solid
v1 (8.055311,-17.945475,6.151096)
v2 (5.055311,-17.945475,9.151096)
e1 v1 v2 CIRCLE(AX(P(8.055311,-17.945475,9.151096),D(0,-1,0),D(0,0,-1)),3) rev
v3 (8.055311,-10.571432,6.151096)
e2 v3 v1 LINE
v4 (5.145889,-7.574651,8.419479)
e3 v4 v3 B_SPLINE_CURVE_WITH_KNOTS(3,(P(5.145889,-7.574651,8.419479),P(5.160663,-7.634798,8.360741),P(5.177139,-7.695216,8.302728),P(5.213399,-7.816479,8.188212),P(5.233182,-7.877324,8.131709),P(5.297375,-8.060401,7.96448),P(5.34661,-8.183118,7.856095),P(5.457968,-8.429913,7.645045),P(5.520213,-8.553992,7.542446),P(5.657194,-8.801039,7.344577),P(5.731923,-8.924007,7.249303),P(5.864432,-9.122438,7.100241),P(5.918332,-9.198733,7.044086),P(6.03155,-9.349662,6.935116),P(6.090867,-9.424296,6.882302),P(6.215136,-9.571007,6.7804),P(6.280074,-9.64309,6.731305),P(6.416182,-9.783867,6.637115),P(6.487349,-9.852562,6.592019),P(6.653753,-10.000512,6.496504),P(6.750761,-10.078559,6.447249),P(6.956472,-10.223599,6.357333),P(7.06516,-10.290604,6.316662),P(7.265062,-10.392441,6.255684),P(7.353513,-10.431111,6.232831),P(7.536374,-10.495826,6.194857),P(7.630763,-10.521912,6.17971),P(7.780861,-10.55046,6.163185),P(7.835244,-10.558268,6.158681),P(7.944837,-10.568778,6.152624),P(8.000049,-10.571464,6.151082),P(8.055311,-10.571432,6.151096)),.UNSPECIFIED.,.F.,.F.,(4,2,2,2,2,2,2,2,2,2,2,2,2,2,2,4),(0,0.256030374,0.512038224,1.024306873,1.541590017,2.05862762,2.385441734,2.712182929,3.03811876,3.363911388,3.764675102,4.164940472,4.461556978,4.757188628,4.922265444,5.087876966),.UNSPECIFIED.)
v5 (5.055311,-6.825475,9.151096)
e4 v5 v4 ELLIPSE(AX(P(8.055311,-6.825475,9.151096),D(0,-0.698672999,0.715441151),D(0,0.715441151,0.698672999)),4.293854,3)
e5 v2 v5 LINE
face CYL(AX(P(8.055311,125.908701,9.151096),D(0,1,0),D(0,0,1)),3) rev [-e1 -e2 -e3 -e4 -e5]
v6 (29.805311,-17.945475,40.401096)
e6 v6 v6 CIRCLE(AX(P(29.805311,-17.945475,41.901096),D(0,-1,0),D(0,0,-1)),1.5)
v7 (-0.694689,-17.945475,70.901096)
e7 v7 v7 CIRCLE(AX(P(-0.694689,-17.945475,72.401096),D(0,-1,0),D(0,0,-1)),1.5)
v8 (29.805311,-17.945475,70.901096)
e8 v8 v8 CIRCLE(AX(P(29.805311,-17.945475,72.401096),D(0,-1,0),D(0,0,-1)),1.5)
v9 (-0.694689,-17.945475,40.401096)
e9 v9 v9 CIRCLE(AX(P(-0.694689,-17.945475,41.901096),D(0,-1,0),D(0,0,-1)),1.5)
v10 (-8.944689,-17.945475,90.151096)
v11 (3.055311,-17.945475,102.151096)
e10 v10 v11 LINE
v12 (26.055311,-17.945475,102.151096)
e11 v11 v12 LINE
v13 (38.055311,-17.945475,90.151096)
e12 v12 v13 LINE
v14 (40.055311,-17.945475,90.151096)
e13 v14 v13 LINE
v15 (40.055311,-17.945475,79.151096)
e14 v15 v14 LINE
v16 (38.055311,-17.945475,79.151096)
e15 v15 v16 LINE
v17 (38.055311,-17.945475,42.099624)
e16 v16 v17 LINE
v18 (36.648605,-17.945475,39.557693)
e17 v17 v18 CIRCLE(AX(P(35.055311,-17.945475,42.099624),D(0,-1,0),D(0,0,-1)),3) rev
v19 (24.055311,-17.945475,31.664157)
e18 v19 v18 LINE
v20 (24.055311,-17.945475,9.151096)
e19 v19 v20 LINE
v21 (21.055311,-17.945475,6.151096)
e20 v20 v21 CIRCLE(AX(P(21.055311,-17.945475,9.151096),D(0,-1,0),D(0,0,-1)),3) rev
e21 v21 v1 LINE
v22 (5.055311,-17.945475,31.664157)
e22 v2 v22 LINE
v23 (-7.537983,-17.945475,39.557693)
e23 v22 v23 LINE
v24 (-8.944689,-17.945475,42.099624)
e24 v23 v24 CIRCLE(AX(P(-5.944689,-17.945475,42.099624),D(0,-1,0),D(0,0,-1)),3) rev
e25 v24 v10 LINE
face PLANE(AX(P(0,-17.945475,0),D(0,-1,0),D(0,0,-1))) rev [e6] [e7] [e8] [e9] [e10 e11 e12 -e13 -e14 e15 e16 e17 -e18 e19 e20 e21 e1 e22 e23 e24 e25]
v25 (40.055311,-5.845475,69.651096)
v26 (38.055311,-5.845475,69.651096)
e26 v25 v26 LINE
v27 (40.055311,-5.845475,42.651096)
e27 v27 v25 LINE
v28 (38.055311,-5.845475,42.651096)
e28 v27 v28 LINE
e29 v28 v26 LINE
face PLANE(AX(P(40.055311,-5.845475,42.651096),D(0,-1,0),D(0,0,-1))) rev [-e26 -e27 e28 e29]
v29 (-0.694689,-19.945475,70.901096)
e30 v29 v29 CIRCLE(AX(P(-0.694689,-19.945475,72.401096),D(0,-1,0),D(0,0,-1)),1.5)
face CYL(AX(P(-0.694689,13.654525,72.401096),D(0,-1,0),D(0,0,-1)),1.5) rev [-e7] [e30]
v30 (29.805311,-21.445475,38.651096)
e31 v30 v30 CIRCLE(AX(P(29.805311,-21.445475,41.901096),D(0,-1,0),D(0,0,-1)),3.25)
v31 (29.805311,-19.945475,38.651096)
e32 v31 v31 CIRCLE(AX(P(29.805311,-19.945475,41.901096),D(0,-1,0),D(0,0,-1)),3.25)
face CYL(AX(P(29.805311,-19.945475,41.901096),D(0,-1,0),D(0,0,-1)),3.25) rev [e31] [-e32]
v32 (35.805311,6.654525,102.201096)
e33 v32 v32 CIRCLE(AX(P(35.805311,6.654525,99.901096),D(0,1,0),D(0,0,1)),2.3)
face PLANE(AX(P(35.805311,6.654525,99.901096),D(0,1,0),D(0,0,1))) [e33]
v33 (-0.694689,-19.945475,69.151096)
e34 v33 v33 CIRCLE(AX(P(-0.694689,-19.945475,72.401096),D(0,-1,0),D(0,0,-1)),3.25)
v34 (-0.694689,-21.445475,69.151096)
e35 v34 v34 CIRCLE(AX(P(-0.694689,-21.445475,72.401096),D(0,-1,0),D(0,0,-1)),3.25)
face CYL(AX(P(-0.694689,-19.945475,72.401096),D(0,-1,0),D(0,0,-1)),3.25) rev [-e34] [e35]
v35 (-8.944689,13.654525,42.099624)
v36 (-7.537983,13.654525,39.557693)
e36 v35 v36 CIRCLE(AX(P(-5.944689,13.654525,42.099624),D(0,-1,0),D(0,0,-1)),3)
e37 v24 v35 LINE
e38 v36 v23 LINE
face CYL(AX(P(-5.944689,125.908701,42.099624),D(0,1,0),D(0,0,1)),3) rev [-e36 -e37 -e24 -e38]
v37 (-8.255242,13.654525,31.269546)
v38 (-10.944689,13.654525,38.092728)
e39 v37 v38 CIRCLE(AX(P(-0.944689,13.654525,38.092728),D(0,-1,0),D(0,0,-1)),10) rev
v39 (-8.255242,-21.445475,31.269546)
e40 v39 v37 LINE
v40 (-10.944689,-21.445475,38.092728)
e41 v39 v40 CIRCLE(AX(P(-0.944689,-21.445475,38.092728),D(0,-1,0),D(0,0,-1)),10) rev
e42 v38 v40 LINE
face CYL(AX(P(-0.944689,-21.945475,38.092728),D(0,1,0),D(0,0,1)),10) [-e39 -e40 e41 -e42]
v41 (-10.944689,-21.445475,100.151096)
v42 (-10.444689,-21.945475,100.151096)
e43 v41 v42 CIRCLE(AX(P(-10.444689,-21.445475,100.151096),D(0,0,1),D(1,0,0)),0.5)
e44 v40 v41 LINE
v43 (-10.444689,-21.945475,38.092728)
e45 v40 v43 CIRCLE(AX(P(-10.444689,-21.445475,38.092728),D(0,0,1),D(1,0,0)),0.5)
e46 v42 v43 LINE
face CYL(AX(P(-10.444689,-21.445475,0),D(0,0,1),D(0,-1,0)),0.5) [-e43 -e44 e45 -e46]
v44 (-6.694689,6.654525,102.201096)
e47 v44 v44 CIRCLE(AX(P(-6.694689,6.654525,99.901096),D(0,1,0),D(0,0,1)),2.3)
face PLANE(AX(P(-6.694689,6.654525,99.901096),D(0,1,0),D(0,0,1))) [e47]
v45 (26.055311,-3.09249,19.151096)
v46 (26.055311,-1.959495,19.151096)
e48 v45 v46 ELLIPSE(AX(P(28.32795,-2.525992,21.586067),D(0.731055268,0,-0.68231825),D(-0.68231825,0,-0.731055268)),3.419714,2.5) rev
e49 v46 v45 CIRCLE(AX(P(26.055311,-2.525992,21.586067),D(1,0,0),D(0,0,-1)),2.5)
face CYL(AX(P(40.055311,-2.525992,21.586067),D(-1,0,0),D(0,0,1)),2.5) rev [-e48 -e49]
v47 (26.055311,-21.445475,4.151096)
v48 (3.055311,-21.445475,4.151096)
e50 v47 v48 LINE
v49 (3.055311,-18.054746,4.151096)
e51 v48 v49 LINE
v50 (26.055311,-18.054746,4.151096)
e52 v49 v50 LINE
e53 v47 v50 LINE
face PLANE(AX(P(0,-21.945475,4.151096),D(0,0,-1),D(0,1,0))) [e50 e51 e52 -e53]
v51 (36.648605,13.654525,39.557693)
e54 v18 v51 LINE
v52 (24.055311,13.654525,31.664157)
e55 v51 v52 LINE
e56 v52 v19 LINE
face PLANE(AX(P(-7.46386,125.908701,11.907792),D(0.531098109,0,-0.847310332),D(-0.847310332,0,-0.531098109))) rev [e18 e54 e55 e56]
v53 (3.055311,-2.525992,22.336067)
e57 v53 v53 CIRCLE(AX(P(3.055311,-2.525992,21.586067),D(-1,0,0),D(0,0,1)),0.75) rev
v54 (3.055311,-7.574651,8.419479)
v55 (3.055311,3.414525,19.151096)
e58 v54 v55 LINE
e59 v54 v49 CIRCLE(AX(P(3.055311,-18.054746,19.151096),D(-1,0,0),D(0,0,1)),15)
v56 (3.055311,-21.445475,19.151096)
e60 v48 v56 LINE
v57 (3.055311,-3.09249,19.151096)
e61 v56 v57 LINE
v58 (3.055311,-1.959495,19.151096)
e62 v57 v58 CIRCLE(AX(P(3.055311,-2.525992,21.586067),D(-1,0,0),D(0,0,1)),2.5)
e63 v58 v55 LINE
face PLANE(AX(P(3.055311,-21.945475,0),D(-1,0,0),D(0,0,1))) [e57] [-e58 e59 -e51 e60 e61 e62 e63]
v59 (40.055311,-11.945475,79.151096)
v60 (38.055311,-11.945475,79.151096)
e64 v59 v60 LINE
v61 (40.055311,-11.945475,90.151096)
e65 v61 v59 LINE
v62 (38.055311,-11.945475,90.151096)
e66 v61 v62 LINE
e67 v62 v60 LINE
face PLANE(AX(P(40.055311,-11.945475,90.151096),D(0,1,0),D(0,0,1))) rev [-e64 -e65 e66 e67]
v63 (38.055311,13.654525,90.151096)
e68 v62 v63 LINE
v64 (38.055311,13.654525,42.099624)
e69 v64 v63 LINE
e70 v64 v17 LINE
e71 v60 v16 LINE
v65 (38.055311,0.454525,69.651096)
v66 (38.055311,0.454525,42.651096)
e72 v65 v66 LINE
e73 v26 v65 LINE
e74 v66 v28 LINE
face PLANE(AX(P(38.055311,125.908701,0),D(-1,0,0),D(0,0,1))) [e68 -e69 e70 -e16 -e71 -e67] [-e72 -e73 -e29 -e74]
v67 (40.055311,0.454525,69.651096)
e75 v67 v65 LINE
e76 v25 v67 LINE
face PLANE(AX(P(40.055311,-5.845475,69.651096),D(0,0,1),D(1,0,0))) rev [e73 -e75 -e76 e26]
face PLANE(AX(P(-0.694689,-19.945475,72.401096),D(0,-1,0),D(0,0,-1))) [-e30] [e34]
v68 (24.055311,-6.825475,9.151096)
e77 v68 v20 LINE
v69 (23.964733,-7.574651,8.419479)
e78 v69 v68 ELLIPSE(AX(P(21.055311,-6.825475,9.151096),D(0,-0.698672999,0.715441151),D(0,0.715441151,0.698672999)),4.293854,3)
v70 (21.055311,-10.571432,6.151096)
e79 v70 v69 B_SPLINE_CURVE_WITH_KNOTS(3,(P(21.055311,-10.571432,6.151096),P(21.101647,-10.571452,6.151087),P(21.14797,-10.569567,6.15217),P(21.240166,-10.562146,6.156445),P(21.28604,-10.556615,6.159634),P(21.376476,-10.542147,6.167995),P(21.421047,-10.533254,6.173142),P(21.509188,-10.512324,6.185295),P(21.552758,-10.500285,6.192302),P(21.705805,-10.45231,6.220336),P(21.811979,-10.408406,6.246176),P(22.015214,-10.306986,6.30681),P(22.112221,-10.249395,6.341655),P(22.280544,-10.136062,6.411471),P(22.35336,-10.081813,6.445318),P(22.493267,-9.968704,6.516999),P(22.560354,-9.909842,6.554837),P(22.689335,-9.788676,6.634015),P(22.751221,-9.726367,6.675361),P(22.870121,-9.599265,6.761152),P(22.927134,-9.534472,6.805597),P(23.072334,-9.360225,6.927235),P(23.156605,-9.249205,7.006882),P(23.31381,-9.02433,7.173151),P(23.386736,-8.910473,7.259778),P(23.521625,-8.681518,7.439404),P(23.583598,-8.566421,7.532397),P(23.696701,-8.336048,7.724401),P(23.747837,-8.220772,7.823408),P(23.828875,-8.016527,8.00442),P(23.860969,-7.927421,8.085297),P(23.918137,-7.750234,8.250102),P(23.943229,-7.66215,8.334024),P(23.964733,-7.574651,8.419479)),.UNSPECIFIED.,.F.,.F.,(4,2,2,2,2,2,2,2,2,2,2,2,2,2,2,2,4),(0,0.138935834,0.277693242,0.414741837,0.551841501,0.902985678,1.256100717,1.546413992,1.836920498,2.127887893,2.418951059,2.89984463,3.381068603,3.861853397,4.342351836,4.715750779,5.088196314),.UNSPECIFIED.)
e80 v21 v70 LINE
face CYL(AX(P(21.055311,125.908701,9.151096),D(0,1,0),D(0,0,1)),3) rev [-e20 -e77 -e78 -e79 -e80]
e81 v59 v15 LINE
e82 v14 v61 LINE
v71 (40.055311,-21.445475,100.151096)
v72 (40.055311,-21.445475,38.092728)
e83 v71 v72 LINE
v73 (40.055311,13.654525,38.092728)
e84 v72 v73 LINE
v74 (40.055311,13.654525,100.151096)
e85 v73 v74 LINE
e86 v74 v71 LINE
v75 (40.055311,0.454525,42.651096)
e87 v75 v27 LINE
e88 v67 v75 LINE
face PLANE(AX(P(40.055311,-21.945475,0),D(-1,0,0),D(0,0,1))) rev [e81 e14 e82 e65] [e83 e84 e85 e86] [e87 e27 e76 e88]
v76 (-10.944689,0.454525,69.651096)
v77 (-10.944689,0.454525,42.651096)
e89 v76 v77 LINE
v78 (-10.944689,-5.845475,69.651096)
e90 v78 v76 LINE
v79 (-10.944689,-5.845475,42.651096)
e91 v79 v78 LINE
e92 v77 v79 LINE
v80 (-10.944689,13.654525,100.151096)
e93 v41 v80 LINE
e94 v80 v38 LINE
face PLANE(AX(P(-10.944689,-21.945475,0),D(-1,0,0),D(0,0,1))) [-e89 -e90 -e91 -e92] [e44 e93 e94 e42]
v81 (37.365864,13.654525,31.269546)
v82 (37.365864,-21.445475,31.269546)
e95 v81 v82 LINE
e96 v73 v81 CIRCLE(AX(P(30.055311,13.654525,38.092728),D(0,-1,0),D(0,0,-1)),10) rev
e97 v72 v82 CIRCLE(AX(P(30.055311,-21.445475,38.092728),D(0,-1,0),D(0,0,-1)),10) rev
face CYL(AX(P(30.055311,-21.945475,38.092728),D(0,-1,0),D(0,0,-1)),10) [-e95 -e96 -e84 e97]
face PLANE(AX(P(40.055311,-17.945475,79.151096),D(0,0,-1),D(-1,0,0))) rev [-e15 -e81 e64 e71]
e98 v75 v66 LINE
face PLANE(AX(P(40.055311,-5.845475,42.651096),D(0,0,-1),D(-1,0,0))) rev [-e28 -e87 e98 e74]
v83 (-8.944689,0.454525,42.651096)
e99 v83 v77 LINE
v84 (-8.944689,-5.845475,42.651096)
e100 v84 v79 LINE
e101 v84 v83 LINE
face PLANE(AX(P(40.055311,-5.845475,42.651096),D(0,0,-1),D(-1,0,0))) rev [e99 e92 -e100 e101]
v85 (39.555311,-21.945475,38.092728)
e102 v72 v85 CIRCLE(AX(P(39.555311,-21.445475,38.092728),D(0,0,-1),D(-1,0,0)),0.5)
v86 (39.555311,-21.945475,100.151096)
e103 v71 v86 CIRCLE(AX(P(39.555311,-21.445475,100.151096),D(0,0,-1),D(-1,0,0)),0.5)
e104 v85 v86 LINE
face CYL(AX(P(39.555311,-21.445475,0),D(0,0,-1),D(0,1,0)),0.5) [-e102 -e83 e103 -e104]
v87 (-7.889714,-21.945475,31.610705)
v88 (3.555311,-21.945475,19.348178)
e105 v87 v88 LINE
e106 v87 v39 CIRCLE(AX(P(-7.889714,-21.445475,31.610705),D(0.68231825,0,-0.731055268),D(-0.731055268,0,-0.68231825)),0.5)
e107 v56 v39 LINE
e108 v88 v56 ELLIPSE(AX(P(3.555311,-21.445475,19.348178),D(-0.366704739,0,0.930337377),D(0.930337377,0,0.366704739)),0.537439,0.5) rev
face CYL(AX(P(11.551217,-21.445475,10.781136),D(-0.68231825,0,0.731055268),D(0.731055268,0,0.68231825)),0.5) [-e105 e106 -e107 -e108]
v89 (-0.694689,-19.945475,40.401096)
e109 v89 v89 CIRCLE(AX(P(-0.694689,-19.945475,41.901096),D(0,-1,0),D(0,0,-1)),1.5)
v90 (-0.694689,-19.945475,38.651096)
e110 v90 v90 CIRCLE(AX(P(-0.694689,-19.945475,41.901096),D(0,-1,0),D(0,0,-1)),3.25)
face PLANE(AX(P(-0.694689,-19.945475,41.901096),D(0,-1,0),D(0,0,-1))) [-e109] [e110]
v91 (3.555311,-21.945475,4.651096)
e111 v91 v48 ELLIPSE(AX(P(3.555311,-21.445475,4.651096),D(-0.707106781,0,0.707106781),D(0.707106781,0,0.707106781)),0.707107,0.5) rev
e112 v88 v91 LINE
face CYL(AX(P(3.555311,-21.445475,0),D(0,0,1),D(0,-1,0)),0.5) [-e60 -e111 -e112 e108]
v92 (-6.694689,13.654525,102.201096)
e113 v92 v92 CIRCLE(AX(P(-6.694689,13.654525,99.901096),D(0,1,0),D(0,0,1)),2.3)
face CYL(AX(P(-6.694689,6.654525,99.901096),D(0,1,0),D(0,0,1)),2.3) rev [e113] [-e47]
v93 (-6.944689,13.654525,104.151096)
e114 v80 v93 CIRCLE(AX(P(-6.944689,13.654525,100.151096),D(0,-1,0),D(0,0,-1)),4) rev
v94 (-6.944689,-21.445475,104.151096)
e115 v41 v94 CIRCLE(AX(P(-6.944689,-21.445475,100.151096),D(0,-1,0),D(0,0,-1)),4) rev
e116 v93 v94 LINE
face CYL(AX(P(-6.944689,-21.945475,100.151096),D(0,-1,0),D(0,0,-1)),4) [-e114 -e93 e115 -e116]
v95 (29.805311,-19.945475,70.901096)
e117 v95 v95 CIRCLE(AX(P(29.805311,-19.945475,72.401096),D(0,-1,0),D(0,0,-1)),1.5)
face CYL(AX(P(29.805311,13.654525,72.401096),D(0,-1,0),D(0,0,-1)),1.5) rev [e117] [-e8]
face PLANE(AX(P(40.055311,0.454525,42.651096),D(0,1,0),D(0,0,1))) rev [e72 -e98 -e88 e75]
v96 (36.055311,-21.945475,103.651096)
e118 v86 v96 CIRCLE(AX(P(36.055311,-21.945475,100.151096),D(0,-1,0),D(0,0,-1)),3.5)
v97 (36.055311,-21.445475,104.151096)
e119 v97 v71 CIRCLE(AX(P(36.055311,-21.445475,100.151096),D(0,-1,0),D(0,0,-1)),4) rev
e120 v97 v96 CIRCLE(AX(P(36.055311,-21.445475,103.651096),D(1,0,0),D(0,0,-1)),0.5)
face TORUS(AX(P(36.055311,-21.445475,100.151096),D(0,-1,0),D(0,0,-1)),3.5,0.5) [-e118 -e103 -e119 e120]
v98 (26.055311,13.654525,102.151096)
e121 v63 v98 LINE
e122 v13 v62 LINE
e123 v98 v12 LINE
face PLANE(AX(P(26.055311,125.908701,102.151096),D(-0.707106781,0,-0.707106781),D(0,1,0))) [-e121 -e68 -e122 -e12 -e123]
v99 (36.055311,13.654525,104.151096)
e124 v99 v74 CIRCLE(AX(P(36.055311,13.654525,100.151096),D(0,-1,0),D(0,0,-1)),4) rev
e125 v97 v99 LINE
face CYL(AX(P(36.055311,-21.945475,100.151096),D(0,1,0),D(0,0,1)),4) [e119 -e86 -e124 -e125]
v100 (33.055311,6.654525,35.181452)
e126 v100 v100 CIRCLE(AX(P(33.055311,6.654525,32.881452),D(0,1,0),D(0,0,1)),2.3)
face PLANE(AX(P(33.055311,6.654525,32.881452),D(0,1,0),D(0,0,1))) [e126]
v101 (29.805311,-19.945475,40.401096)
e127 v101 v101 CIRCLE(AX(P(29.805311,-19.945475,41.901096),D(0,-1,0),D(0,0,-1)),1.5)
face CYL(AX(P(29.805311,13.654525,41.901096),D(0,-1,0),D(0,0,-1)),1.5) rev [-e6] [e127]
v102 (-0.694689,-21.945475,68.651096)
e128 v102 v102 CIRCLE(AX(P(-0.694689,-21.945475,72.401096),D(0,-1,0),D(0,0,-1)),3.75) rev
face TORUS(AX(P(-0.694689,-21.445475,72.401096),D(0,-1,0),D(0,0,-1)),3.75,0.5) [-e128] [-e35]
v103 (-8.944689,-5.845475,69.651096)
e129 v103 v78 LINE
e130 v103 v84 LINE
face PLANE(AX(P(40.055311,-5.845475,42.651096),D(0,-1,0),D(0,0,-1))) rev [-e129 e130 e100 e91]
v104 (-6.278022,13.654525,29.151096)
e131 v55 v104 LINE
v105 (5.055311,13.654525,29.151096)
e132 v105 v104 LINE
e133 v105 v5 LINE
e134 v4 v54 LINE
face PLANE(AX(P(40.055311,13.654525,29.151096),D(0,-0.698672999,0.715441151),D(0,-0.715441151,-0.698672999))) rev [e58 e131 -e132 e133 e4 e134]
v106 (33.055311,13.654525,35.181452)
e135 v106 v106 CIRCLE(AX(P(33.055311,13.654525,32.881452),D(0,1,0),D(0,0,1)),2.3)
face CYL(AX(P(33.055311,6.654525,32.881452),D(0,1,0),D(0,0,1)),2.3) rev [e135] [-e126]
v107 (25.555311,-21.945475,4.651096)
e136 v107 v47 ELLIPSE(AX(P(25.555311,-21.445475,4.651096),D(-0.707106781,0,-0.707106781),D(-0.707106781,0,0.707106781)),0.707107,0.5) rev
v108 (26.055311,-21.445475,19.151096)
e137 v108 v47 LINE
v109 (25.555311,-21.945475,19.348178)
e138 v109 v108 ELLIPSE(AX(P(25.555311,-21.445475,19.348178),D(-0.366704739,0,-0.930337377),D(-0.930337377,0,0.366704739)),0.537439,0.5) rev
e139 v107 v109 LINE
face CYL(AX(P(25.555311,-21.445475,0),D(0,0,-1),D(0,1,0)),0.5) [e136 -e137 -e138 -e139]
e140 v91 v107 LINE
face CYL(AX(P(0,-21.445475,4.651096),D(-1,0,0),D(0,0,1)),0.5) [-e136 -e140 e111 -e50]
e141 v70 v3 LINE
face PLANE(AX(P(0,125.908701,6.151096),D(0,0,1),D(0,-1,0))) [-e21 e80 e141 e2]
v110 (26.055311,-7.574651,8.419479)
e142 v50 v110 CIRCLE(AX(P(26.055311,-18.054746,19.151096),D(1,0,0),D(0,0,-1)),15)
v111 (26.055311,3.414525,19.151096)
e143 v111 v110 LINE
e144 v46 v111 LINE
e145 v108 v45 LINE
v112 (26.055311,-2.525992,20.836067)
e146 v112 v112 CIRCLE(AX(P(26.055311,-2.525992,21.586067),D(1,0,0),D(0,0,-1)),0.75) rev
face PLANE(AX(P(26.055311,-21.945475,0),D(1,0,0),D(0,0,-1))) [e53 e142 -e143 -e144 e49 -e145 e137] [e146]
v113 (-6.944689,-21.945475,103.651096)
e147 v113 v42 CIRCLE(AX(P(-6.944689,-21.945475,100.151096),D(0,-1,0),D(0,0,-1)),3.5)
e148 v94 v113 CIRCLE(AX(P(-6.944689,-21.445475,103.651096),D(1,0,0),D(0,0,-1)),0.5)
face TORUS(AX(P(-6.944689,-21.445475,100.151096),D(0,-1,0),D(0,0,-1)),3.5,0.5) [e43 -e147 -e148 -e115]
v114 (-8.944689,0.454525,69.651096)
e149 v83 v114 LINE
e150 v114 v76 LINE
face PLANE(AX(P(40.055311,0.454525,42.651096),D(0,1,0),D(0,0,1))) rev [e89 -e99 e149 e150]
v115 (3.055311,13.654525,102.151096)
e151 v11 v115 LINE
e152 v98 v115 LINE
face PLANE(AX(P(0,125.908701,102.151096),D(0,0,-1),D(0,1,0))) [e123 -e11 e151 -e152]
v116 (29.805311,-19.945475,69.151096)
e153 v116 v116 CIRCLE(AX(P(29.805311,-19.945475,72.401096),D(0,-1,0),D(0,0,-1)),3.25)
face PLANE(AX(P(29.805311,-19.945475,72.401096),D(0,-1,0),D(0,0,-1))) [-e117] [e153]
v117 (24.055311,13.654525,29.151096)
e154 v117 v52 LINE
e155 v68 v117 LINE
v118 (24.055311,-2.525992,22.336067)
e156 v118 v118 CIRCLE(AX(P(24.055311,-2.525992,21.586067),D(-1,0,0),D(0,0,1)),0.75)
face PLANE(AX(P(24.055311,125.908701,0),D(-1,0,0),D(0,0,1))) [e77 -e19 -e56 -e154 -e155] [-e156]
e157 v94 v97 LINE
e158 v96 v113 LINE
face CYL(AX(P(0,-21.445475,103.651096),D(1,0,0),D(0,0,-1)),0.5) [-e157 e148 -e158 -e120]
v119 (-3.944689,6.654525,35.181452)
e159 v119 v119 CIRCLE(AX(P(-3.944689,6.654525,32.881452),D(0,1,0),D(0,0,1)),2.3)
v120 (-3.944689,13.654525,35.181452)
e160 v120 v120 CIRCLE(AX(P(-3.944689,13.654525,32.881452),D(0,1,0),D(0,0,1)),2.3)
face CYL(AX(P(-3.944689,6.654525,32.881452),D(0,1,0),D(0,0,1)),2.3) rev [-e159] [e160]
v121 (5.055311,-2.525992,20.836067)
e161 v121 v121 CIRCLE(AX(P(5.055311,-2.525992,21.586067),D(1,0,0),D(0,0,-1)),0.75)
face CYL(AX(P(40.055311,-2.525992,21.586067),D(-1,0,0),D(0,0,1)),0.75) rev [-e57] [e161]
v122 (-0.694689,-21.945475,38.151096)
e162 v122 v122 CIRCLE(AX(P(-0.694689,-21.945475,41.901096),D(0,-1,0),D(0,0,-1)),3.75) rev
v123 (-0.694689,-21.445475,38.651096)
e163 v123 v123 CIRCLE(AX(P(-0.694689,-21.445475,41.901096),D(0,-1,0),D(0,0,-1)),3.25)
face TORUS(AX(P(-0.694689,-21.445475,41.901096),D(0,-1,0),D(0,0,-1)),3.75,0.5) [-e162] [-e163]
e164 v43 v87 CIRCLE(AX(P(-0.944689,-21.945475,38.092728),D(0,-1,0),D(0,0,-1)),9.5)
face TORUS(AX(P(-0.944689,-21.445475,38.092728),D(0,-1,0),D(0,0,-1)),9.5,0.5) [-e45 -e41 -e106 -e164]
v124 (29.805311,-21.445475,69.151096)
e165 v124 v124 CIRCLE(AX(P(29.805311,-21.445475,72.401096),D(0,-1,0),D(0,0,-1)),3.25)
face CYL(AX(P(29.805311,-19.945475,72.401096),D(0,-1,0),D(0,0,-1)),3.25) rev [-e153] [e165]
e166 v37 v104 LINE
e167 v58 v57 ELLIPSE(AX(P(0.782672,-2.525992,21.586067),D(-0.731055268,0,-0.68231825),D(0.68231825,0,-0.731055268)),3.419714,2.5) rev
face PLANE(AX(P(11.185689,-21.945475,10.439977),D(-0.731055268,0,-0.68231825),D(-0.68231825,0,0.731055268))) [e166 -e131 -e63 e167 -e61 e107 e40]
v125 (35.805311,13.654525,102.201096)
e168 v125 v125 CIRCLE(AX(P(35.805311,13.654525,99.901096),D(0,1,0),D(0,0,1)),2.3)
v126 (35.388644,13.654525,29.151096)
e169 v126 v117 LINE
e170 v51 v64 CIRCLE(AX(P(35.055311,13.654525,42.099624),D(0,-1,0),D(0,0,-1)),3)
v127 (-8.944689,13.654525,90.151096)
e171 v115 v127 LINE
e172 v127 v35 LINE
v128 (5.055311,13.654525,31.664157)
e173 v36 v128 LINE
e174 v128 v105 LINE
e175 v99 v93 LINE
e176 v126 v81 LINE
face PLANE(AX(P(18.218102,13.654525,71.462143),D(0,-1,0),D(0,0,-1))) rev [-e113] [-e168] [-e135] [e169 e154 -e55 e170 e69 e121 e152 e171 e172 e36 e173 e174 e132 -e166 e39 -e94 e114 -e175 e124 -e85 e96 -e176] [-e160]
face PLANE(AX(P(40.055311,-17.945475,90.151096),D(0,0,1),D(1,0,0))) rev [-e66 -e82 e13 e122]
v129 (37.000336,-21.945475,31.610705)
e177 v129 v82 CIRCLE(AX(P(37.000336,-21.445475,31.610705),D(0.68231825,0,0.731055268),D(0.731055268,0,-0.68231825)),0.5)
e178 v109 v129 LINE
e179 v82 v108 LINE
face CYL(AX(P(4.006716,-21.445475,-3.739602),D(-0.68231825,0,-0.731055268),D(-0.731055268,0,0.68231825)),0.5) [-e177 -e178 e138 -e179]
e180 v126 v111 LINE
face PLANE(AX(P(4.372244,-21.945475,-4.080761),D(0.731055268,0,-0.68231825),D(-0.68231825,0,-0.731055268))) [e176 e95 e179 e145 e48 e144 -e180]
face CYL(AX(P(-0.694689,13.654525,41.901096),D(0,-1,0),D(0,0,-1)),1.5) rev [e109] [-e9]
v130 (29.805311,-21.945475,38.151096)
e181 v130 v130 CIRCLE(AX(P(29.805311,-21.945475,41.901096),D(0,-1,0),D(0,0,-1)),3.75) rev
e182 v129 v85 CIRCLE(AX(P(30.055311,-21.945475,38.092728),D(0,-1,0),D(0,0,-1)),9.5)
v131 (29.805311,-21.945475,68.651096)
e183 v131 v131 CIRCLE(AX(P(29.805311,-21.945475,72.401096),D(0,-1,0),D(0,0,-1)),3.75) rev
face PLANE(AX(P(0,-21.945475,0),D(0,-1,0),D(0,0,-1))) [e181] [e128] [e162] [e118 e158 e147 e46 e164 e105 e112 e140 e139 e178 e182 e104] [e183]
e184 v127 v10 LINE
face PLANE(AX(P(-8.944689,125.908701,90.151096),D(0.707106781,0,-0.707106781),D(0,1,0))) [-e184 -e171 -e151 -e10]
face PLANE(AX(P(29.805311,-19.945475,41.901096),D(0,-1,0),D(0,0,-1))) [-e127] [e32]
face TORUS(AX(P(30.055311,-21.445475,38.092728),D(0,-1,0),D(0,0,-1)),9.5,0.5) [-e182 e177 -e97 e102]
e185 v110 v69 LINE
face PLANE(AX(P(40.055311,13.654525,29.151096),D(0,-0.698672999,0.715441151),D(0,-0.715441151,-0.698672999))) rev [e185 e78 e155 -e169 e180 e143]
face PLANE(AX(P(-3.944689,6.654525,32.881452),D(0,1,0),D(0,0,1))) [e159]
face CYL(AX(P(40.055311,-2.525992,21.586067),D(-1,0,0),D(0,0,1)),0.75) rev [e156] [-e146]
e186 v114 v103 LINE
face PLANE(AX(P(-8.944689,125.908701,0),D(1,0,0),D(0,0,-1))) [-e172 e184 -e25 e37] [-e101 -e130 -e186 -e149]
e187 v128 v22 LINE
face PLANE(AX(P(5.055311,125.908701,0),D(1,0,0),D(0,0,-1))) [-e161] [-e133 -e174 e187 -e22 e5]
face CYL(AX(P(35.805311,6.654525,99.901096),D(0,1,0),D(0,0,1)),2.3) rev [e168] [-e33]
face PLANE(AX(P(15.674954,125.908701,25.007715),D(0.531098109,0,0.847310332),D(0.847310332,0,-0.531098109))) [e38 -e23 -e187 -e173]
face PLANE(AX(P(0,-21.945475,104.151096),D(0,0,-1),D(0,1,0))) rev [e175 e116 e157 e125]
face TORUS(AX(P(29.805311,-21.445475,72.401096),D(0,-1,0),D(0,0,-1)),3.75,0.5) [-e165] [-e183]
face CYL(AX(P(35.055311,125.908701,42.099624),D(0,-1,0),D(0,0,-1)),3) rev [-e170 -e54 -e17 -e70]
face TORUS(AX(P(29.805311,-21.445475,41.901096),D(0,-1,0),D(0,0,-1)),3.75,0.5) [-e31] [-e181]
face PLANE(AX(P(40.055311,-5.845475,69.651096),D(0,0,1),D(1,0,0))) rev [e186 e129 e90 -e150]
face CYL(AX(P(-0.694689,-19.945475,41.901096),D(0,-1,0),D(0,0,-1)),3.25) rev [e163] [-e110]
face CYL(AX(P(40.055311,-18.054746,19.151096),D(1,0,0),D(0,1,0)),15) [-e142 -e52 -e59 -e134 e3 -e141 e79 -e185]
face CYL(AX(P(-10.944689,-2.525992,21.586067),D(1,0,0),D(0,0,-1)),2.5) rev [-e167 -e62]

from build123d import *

# Parameters (mm, degrees)
SKETCH1_R               = 1.25
BOSS_EXTRUDE1_DEPTH     = 4
BOSS_EXTRUDE2_DEPTH     = 31.6
CUT_EXTRUDE1_DEPTH      = 119.025653029
FILLET1_R               = 15
FILLET2_R               = 3
FILLET3_R               = 3
SKETCH4_R               = 3.25
CUT_EXTRUDE2_DEPTH      = 2
SKETCH5_R               = 1.5
CUT_EXTRUDE3_DEPTH      = 117.536856073
CHAMFER1_SIZE           = 12
SKETCH6_R               = 2.3
CUT_EXTRUDE4_DEPTH      = 7
FILLET4_R               = 10
FILLET5_R               = 4
CUT_EXTRUDE5_DEPTH      = 113.685645816
CUT_EXTRUDE5_DEPTH_BACK = 113.685645816
SKETCH8_R               = 0.75
SKETCH9_R               = 2.5
CUT_EXTRUDE6_DEPTH      = 113.685645816
CUT_EXTRUDE7_START      = -23
SKETCH9_2_R             = 2.5
CUT_EXTRUDE7_DEPTH      = 90.685645816
SKETCH10_W              = 27
SKETCH10_H              = 6.3
CUT_EXTRUDE8_DEPTH      = 119.025653029
FILLET6_R               = 0.5
SKETCH11_W              = 11
SKETCH11_H              = 6
CUT_EXTRUDE9_DEPTH      = 118.175316416


with BuildPart() as part:
    # Sketch1 → Boss-Extrude1 (new body)
    # profile 1 of 3: a face of its own
    with BuildSketch(Plane.XZ.offset(17.94547529)):
        Polygon((3.055310961, 4.151096428), (26.055310961, 4.151096428), (26.055310961, 19.151096428), (40.055310961, 34.151096428), (40.055310961, 104.151096428), (-10.944689039, 104.151096428), (-10.944689039, 34.151096428), (3.055310961, 19.151096428), align=None)
        with BuildLine():
            ThreePointArc((1.805310961, 41.901096428), (1.47037447, 40.651096428), (0.555310961, 39.736032919))
            ThreePointArc((0.555310961, 39.736032919), (-0.694689039, 39.401096428), (-1.944689039, 39.736032919))
            ThreePointArc((-1.944689039, 39.736032919), (-2.859752549, 40.651096428), (-3.194689039, 41.901096428))
            ThreePointArc((-3.194689039, 41.901096428), (-2.859752549, 43.151096428), (-1.944689039, 44.066159938))
            ThreePointArc((-1.944689039, 44.066159938), (-0.694689039, 44.401096428), (0.555310961, 44.066159938))
            ThreePointArc((0.555310961, 44.066159938), (1.47037447, 43.151096428), (1.805310961, 41.901096428))
        make_face(mode=Mode.SUBTRACT)
    # profile 2 of 3: a face of its own
    with BuildSketch(Plane.XZ.offset(17.94547529)):
        with BuildLine():
            ThreePointArc((-1.944689039, 39.736032919), (-0.694689039, 39.401096428), (0.555310961, 39.736032919))
            ThreePointArc((0.555310961, 39.736032919), (1.47037447, 40.651096428), (1.805310961, 41.901096428))
            ThreePointArc((1.805310961, 41.901096428), (1.47037447, 43.151096428), (0.555310961, 44.066159938))
            ThreePointArc((0.555310961, 44.066159938), (-0.694689039, 44.401096428), (-1.944689039, 44.066159938))
            ThreePointArc((-1.944689039, 44.066159938), (-2.859752549, 43.151096428), (-3.194689039, 41.901096428))
            ThreePointArc((-3.194689039, 41.901096428), (-2.859752549, 40.651096428), (-1.944689039, 39.736032919))
        make_face()
        with Locations((-0.694689039, 41.901096428)):
            Circle(SKETCH1_R, mode=Mode.SUBTRACT)
    # profile 3 of 3: a face of its own
    with BuildSketch(Plane.XZ.offset(17.94547529)):
        with Locations((-0.694689039, 41.901096428)):
            Circle(SKETCH1_R)
    extrude(amount=BOSS_EXTRUDE1_DEPTH)

    # Sketch2 → Boss-Extrude2 (add)
    with BuildSketch(Plane(origin=(0, -17.94547529, 0), x_dir=(1, 0, 0), z_dir=(0, 1, 0))):
        Polygon((3.055310961, -4.151096428), (3.055310961, -19.151096428), (-10.944689039, -34.151096428), (-10.944689039, -104.151096428), (40.055310961, -104.151096428), (40.055310961, -34.151096428), (26.055310961, -19.151096428), (26.055310961, -4.151096428), align=None)
        Polygon((5.055310961, -31.664156806), (5.055310961, -6.151096428), (24.055310961, -6.151096428), (24.055310961, -31.664156806), (38.055310961, -40.43942279), (38.055310961, -102.151096428), (-8.944689039, -102.151096428), (-8.944689039, -40.43942279), align=None, mode=Mode.SUBTRACT)
    extrude(amount=BOSS_EXTRUDE2_DEPTH)

    # Sketch3 → Cut-Extrude1 (cut, through all)
    with BuildSketch(Plane.ZY.offset(10.944689039)):
        Polygon((29.151096428, 13.65452471), (4.151096428, -11.94547529), (4.151096428, 13.65452471), align=None)
    extrude(amount=-CUT_EXTRUDE1_DEPTH, mode=Mode.SUBTRACT)

    # Fillet1
    # the kernel refuses this fillet: 15 mm, written as the material it takes off along each edge
    with BuildSketch(Plane(origin=(-12.217866698, -11.94547529, 4.151096428), x_dir=(0, 0.7154411509611464, 0.6986729989854984), z_dir=(1, 0, 0))) as fillet1_piece_1:
        with BuildLine():
            CenterArc((FILLET1_R * 0.40728473757, FILLET1_R), FILLET1_R, 225.679364755, 44.320635245)
            Line((-FILLET1_R * 0.291388261416, FILLET1_R * 0.284558849039), (0, 0))
            Line((0, 0), (FILLET1_R * 0.40728473757, 0))
        make_face()
    extrude(amount=53.546355318, mode=Mode.SUBTRACT)

    # Fillet2
    fillet2_edges = [part.edges().sort_by_distance(p)[0] for p in [
        (5.055310961, -14.258453435, 6.151096428),
        (24.055310961, -14.258453435, 6.151096428),
    ]]
    fillet(fillet2_edges, radius=FILLET2_R)

    # Fillet3
    fillet3_edges = [part.edges().sort_by_distance(p)[0] for p in [
        (-8.944689039, -2.14547529, 40.43942279),
        (38.055310961, -2.14547529, 40.43942279),
    ]]
    fillet(fillet3_edges, radius=FILLET3_R)

    # Sketch4 → Cut-Extrude2 (cut)
    with BuildSketch(Plane.XZ.offset(21.94547529)):
        with Locations(Location((-0.694689039, 41.901096428, 0), (0, 0, 270))):
            Circle(SKETCH4_R)
        with Locations(Location((-0.694689039, 72.401096428, 0), (0, 0, 270))):
            Circle(SKETCH4_R)
        with Locations(Location((29.805310961, 72.401096428, 0), (0, 0, 270))):
            Circle(SKETCH4_R)
        with Locations(Location((29.805310961, 41.901096428, 0), (0, 0, 270))):
            Circle(SKETCH4_R)
    extrude(amount=-CUT_EXTRUDE2_DEPTH, mode=Mode.SUBTRACT)

    # Sketch5 → Cut-Extrude3 (cut, through all)
    with BuildSketch(Plane.XZ.offset(19.94547529)):
        with Locations(Location((-0.694689039, 41.901096428, 0), (0, 0, 270))):
            Circle(SKETCH5_R)
        with Locations(Location((-0.694689039, 72.401096428, 0), (0, 0, 270))):
            Circle(SKETCH5_R)
        with Locations(Location((29.805310961, 72.401096428, 0), (0, 0, 270))):
            Circle(SKETCH5_R)
        with Locations(Location((29.805310961, 41.901096428, 0), (0, 0, 270))):
            Circle(SKETCH5_R)
    extrude(amount=-CUT_EXTRUDE3_DEPTH, mode=Mode.SUBTRACT)

    # Chamfer1
    chamfer1_edges = [part.edges().sort_by_distance(p)[0] for p in [
        (-8.944689039, -2.14547529, 102.151096428),
        (38.055310961, -2.14547529, 102.151096428),
    ]]
    chamfer(chamfer1_edges, length=CHAMFER1_SIZE)

    # Sketch6 → Cut-Extrude4 (cut)
    with BuildSketch(Plane(origin=(0, 13.65452471, 0), x_dir=(1, 0, 0), z_dir=(0, 1, 0))):
        with Locations(Location((33.055310961, -32.881452384, 0), (0, 0, 270))):
            Circle(SKETCH6_R)
        with Locations(Location((-3.944689039, -32.881452384, 0), (0, 0, 270))):
            Circle(SKETCH6_R)
        with Locations(Location((35.805310961, -99.901096428, 0), (0, 0, 270))):
            Circle(SKETCH6_R)
        with Locations(Location((-6.694689039, -99.901096428, 0), (0, 0, 270))):
            Circle(SKETCH6_R)
    extrude(amount=-CUT_EXTRUDE4_DEPTH, mode=Mode.SUBTRACT)

    # Fillet4
    fillet4_edges = [part.edges().sort_by_distance(p)[0] for p in [
        (-10.944689039, -4.14547529, 34.151096428),
        (40.055310961, -4.14547529, 34.151096428),
    ]]
    fillet(fillet4_edges, radius=FILLET4_R)

    # Fillet5
    fillet5_edges = [part.edges().sort_by_distance(p)[0] for p in [
        (-10.944689039, -4.14547529, 104.151096428),
        (40.055310961, -4.14547529, 104.151096428),
    ]]
    fillet(fillet5_edges, radius=FILLET5_R)

    # Sketch8 → Cut-Extrude5 (cut, two sides: drawn at the far end of the back side and taken through both)
    with BuildSketch(Plane.ZY.offset(-3.055310961).offset(-CUT_EXTRUDE5_DEPTH_BACK)):
        with Locations((21.586066765, -2.525992097)):
            Circle(SKETCH8_R)
    extrude(amount=CUT_EXTRUDE5_DEPTH + CUT_EXTRUDE5_DEPTH_BACK, mode=Mode.SUBTRACT)

    # Sketch9 → Cut-Extrude6 (cut, through all)
    with BuildSketch(Plane.ZY.offset(-3.055310961)):
        with Locations((21.586066765, -2.525992097)):
            Circle(SKETCH9_R)
    extrude(amount=CUT_EXTRUDE6_DEPTH, mode=Mode.SUBTRACT)

    # Sketch9<2> → Cut-Extrude7 (cut, through all)
    with BuildSketch(Plane.ZY.offset(-3.055310961).offset(CUT_EXTRUDE7_START)):
        with Locations((21.586066765, -2.525992097)):
            Circle(SKETCH9_2_R)
    extrude(amount=-CUT_EXTRUDE7_DEPTH, mode=Mode.SUBTRACT)

    # Sketch10 → Cut-Extrude8 (cut, through all)
    with BuildSketch(Plane.ZY.offset(10.944689039)):
        with Locations((56.151096428, -2.69547529)):
            Rectangle(SKETCH10_W, SKETCH10_H)
    extrude(amount=-CUT_EXTRUDE8_DEPTH, mode=Mode.SUBTRACT)

    # Fillet6
    fillet6_edges = [part.edges().sort_by_distance(p)[0] for p in [
        (3.055310961, -21.94547529, 11.651096428),
        (14.555310961, -21.94547529, 4.151096428),
        (29.805310961, -21.94547529, 45.151096428),
        (29.805310961, -21.94547529, 75.651096428),
        (-0.694689039, -21.94547529, 75.651096428),
        (-0.694689039, -21.94547529, 45.151096428),
        (26.055310961, -21.94547529, 11.651096428),
        (40.055310961, -21.94547529, 69.121912331),
        (31.710587302, -21.94547529, 25.21032108),
        (-10.944689039, -21.94547529, 69.121912331),
        (-10.248062804, -21.94547529, 34.425680841),
        (39.358684726, -21.94547529, 34.425680841),
        (14.555310961, -21.94547529, 104.151096428),
        (-9.773116164, -21.94547529, 102.979523553),
        (38.883738086, -21.94547529, 102.979523553),
        (-2.59996538, -21.94547529, 25.21032108),
    ]]
    fillet(fillet6_edges, radius=FILLET6_R)

    # Sketch11 → Cut-Extrude9 (cut, through all)
    with BuildSketch(Plane.ZY.offset(-38.055310961)):
        with Locations((84.651096428, -14.94547529)):
            Rectangle(SKETCH11_W, SKETCH11_H)
    extrude(amount=-CUT_EXTRUDE9_DEPTH, mode=Mode.SUBTRACT)


solid = part.part
